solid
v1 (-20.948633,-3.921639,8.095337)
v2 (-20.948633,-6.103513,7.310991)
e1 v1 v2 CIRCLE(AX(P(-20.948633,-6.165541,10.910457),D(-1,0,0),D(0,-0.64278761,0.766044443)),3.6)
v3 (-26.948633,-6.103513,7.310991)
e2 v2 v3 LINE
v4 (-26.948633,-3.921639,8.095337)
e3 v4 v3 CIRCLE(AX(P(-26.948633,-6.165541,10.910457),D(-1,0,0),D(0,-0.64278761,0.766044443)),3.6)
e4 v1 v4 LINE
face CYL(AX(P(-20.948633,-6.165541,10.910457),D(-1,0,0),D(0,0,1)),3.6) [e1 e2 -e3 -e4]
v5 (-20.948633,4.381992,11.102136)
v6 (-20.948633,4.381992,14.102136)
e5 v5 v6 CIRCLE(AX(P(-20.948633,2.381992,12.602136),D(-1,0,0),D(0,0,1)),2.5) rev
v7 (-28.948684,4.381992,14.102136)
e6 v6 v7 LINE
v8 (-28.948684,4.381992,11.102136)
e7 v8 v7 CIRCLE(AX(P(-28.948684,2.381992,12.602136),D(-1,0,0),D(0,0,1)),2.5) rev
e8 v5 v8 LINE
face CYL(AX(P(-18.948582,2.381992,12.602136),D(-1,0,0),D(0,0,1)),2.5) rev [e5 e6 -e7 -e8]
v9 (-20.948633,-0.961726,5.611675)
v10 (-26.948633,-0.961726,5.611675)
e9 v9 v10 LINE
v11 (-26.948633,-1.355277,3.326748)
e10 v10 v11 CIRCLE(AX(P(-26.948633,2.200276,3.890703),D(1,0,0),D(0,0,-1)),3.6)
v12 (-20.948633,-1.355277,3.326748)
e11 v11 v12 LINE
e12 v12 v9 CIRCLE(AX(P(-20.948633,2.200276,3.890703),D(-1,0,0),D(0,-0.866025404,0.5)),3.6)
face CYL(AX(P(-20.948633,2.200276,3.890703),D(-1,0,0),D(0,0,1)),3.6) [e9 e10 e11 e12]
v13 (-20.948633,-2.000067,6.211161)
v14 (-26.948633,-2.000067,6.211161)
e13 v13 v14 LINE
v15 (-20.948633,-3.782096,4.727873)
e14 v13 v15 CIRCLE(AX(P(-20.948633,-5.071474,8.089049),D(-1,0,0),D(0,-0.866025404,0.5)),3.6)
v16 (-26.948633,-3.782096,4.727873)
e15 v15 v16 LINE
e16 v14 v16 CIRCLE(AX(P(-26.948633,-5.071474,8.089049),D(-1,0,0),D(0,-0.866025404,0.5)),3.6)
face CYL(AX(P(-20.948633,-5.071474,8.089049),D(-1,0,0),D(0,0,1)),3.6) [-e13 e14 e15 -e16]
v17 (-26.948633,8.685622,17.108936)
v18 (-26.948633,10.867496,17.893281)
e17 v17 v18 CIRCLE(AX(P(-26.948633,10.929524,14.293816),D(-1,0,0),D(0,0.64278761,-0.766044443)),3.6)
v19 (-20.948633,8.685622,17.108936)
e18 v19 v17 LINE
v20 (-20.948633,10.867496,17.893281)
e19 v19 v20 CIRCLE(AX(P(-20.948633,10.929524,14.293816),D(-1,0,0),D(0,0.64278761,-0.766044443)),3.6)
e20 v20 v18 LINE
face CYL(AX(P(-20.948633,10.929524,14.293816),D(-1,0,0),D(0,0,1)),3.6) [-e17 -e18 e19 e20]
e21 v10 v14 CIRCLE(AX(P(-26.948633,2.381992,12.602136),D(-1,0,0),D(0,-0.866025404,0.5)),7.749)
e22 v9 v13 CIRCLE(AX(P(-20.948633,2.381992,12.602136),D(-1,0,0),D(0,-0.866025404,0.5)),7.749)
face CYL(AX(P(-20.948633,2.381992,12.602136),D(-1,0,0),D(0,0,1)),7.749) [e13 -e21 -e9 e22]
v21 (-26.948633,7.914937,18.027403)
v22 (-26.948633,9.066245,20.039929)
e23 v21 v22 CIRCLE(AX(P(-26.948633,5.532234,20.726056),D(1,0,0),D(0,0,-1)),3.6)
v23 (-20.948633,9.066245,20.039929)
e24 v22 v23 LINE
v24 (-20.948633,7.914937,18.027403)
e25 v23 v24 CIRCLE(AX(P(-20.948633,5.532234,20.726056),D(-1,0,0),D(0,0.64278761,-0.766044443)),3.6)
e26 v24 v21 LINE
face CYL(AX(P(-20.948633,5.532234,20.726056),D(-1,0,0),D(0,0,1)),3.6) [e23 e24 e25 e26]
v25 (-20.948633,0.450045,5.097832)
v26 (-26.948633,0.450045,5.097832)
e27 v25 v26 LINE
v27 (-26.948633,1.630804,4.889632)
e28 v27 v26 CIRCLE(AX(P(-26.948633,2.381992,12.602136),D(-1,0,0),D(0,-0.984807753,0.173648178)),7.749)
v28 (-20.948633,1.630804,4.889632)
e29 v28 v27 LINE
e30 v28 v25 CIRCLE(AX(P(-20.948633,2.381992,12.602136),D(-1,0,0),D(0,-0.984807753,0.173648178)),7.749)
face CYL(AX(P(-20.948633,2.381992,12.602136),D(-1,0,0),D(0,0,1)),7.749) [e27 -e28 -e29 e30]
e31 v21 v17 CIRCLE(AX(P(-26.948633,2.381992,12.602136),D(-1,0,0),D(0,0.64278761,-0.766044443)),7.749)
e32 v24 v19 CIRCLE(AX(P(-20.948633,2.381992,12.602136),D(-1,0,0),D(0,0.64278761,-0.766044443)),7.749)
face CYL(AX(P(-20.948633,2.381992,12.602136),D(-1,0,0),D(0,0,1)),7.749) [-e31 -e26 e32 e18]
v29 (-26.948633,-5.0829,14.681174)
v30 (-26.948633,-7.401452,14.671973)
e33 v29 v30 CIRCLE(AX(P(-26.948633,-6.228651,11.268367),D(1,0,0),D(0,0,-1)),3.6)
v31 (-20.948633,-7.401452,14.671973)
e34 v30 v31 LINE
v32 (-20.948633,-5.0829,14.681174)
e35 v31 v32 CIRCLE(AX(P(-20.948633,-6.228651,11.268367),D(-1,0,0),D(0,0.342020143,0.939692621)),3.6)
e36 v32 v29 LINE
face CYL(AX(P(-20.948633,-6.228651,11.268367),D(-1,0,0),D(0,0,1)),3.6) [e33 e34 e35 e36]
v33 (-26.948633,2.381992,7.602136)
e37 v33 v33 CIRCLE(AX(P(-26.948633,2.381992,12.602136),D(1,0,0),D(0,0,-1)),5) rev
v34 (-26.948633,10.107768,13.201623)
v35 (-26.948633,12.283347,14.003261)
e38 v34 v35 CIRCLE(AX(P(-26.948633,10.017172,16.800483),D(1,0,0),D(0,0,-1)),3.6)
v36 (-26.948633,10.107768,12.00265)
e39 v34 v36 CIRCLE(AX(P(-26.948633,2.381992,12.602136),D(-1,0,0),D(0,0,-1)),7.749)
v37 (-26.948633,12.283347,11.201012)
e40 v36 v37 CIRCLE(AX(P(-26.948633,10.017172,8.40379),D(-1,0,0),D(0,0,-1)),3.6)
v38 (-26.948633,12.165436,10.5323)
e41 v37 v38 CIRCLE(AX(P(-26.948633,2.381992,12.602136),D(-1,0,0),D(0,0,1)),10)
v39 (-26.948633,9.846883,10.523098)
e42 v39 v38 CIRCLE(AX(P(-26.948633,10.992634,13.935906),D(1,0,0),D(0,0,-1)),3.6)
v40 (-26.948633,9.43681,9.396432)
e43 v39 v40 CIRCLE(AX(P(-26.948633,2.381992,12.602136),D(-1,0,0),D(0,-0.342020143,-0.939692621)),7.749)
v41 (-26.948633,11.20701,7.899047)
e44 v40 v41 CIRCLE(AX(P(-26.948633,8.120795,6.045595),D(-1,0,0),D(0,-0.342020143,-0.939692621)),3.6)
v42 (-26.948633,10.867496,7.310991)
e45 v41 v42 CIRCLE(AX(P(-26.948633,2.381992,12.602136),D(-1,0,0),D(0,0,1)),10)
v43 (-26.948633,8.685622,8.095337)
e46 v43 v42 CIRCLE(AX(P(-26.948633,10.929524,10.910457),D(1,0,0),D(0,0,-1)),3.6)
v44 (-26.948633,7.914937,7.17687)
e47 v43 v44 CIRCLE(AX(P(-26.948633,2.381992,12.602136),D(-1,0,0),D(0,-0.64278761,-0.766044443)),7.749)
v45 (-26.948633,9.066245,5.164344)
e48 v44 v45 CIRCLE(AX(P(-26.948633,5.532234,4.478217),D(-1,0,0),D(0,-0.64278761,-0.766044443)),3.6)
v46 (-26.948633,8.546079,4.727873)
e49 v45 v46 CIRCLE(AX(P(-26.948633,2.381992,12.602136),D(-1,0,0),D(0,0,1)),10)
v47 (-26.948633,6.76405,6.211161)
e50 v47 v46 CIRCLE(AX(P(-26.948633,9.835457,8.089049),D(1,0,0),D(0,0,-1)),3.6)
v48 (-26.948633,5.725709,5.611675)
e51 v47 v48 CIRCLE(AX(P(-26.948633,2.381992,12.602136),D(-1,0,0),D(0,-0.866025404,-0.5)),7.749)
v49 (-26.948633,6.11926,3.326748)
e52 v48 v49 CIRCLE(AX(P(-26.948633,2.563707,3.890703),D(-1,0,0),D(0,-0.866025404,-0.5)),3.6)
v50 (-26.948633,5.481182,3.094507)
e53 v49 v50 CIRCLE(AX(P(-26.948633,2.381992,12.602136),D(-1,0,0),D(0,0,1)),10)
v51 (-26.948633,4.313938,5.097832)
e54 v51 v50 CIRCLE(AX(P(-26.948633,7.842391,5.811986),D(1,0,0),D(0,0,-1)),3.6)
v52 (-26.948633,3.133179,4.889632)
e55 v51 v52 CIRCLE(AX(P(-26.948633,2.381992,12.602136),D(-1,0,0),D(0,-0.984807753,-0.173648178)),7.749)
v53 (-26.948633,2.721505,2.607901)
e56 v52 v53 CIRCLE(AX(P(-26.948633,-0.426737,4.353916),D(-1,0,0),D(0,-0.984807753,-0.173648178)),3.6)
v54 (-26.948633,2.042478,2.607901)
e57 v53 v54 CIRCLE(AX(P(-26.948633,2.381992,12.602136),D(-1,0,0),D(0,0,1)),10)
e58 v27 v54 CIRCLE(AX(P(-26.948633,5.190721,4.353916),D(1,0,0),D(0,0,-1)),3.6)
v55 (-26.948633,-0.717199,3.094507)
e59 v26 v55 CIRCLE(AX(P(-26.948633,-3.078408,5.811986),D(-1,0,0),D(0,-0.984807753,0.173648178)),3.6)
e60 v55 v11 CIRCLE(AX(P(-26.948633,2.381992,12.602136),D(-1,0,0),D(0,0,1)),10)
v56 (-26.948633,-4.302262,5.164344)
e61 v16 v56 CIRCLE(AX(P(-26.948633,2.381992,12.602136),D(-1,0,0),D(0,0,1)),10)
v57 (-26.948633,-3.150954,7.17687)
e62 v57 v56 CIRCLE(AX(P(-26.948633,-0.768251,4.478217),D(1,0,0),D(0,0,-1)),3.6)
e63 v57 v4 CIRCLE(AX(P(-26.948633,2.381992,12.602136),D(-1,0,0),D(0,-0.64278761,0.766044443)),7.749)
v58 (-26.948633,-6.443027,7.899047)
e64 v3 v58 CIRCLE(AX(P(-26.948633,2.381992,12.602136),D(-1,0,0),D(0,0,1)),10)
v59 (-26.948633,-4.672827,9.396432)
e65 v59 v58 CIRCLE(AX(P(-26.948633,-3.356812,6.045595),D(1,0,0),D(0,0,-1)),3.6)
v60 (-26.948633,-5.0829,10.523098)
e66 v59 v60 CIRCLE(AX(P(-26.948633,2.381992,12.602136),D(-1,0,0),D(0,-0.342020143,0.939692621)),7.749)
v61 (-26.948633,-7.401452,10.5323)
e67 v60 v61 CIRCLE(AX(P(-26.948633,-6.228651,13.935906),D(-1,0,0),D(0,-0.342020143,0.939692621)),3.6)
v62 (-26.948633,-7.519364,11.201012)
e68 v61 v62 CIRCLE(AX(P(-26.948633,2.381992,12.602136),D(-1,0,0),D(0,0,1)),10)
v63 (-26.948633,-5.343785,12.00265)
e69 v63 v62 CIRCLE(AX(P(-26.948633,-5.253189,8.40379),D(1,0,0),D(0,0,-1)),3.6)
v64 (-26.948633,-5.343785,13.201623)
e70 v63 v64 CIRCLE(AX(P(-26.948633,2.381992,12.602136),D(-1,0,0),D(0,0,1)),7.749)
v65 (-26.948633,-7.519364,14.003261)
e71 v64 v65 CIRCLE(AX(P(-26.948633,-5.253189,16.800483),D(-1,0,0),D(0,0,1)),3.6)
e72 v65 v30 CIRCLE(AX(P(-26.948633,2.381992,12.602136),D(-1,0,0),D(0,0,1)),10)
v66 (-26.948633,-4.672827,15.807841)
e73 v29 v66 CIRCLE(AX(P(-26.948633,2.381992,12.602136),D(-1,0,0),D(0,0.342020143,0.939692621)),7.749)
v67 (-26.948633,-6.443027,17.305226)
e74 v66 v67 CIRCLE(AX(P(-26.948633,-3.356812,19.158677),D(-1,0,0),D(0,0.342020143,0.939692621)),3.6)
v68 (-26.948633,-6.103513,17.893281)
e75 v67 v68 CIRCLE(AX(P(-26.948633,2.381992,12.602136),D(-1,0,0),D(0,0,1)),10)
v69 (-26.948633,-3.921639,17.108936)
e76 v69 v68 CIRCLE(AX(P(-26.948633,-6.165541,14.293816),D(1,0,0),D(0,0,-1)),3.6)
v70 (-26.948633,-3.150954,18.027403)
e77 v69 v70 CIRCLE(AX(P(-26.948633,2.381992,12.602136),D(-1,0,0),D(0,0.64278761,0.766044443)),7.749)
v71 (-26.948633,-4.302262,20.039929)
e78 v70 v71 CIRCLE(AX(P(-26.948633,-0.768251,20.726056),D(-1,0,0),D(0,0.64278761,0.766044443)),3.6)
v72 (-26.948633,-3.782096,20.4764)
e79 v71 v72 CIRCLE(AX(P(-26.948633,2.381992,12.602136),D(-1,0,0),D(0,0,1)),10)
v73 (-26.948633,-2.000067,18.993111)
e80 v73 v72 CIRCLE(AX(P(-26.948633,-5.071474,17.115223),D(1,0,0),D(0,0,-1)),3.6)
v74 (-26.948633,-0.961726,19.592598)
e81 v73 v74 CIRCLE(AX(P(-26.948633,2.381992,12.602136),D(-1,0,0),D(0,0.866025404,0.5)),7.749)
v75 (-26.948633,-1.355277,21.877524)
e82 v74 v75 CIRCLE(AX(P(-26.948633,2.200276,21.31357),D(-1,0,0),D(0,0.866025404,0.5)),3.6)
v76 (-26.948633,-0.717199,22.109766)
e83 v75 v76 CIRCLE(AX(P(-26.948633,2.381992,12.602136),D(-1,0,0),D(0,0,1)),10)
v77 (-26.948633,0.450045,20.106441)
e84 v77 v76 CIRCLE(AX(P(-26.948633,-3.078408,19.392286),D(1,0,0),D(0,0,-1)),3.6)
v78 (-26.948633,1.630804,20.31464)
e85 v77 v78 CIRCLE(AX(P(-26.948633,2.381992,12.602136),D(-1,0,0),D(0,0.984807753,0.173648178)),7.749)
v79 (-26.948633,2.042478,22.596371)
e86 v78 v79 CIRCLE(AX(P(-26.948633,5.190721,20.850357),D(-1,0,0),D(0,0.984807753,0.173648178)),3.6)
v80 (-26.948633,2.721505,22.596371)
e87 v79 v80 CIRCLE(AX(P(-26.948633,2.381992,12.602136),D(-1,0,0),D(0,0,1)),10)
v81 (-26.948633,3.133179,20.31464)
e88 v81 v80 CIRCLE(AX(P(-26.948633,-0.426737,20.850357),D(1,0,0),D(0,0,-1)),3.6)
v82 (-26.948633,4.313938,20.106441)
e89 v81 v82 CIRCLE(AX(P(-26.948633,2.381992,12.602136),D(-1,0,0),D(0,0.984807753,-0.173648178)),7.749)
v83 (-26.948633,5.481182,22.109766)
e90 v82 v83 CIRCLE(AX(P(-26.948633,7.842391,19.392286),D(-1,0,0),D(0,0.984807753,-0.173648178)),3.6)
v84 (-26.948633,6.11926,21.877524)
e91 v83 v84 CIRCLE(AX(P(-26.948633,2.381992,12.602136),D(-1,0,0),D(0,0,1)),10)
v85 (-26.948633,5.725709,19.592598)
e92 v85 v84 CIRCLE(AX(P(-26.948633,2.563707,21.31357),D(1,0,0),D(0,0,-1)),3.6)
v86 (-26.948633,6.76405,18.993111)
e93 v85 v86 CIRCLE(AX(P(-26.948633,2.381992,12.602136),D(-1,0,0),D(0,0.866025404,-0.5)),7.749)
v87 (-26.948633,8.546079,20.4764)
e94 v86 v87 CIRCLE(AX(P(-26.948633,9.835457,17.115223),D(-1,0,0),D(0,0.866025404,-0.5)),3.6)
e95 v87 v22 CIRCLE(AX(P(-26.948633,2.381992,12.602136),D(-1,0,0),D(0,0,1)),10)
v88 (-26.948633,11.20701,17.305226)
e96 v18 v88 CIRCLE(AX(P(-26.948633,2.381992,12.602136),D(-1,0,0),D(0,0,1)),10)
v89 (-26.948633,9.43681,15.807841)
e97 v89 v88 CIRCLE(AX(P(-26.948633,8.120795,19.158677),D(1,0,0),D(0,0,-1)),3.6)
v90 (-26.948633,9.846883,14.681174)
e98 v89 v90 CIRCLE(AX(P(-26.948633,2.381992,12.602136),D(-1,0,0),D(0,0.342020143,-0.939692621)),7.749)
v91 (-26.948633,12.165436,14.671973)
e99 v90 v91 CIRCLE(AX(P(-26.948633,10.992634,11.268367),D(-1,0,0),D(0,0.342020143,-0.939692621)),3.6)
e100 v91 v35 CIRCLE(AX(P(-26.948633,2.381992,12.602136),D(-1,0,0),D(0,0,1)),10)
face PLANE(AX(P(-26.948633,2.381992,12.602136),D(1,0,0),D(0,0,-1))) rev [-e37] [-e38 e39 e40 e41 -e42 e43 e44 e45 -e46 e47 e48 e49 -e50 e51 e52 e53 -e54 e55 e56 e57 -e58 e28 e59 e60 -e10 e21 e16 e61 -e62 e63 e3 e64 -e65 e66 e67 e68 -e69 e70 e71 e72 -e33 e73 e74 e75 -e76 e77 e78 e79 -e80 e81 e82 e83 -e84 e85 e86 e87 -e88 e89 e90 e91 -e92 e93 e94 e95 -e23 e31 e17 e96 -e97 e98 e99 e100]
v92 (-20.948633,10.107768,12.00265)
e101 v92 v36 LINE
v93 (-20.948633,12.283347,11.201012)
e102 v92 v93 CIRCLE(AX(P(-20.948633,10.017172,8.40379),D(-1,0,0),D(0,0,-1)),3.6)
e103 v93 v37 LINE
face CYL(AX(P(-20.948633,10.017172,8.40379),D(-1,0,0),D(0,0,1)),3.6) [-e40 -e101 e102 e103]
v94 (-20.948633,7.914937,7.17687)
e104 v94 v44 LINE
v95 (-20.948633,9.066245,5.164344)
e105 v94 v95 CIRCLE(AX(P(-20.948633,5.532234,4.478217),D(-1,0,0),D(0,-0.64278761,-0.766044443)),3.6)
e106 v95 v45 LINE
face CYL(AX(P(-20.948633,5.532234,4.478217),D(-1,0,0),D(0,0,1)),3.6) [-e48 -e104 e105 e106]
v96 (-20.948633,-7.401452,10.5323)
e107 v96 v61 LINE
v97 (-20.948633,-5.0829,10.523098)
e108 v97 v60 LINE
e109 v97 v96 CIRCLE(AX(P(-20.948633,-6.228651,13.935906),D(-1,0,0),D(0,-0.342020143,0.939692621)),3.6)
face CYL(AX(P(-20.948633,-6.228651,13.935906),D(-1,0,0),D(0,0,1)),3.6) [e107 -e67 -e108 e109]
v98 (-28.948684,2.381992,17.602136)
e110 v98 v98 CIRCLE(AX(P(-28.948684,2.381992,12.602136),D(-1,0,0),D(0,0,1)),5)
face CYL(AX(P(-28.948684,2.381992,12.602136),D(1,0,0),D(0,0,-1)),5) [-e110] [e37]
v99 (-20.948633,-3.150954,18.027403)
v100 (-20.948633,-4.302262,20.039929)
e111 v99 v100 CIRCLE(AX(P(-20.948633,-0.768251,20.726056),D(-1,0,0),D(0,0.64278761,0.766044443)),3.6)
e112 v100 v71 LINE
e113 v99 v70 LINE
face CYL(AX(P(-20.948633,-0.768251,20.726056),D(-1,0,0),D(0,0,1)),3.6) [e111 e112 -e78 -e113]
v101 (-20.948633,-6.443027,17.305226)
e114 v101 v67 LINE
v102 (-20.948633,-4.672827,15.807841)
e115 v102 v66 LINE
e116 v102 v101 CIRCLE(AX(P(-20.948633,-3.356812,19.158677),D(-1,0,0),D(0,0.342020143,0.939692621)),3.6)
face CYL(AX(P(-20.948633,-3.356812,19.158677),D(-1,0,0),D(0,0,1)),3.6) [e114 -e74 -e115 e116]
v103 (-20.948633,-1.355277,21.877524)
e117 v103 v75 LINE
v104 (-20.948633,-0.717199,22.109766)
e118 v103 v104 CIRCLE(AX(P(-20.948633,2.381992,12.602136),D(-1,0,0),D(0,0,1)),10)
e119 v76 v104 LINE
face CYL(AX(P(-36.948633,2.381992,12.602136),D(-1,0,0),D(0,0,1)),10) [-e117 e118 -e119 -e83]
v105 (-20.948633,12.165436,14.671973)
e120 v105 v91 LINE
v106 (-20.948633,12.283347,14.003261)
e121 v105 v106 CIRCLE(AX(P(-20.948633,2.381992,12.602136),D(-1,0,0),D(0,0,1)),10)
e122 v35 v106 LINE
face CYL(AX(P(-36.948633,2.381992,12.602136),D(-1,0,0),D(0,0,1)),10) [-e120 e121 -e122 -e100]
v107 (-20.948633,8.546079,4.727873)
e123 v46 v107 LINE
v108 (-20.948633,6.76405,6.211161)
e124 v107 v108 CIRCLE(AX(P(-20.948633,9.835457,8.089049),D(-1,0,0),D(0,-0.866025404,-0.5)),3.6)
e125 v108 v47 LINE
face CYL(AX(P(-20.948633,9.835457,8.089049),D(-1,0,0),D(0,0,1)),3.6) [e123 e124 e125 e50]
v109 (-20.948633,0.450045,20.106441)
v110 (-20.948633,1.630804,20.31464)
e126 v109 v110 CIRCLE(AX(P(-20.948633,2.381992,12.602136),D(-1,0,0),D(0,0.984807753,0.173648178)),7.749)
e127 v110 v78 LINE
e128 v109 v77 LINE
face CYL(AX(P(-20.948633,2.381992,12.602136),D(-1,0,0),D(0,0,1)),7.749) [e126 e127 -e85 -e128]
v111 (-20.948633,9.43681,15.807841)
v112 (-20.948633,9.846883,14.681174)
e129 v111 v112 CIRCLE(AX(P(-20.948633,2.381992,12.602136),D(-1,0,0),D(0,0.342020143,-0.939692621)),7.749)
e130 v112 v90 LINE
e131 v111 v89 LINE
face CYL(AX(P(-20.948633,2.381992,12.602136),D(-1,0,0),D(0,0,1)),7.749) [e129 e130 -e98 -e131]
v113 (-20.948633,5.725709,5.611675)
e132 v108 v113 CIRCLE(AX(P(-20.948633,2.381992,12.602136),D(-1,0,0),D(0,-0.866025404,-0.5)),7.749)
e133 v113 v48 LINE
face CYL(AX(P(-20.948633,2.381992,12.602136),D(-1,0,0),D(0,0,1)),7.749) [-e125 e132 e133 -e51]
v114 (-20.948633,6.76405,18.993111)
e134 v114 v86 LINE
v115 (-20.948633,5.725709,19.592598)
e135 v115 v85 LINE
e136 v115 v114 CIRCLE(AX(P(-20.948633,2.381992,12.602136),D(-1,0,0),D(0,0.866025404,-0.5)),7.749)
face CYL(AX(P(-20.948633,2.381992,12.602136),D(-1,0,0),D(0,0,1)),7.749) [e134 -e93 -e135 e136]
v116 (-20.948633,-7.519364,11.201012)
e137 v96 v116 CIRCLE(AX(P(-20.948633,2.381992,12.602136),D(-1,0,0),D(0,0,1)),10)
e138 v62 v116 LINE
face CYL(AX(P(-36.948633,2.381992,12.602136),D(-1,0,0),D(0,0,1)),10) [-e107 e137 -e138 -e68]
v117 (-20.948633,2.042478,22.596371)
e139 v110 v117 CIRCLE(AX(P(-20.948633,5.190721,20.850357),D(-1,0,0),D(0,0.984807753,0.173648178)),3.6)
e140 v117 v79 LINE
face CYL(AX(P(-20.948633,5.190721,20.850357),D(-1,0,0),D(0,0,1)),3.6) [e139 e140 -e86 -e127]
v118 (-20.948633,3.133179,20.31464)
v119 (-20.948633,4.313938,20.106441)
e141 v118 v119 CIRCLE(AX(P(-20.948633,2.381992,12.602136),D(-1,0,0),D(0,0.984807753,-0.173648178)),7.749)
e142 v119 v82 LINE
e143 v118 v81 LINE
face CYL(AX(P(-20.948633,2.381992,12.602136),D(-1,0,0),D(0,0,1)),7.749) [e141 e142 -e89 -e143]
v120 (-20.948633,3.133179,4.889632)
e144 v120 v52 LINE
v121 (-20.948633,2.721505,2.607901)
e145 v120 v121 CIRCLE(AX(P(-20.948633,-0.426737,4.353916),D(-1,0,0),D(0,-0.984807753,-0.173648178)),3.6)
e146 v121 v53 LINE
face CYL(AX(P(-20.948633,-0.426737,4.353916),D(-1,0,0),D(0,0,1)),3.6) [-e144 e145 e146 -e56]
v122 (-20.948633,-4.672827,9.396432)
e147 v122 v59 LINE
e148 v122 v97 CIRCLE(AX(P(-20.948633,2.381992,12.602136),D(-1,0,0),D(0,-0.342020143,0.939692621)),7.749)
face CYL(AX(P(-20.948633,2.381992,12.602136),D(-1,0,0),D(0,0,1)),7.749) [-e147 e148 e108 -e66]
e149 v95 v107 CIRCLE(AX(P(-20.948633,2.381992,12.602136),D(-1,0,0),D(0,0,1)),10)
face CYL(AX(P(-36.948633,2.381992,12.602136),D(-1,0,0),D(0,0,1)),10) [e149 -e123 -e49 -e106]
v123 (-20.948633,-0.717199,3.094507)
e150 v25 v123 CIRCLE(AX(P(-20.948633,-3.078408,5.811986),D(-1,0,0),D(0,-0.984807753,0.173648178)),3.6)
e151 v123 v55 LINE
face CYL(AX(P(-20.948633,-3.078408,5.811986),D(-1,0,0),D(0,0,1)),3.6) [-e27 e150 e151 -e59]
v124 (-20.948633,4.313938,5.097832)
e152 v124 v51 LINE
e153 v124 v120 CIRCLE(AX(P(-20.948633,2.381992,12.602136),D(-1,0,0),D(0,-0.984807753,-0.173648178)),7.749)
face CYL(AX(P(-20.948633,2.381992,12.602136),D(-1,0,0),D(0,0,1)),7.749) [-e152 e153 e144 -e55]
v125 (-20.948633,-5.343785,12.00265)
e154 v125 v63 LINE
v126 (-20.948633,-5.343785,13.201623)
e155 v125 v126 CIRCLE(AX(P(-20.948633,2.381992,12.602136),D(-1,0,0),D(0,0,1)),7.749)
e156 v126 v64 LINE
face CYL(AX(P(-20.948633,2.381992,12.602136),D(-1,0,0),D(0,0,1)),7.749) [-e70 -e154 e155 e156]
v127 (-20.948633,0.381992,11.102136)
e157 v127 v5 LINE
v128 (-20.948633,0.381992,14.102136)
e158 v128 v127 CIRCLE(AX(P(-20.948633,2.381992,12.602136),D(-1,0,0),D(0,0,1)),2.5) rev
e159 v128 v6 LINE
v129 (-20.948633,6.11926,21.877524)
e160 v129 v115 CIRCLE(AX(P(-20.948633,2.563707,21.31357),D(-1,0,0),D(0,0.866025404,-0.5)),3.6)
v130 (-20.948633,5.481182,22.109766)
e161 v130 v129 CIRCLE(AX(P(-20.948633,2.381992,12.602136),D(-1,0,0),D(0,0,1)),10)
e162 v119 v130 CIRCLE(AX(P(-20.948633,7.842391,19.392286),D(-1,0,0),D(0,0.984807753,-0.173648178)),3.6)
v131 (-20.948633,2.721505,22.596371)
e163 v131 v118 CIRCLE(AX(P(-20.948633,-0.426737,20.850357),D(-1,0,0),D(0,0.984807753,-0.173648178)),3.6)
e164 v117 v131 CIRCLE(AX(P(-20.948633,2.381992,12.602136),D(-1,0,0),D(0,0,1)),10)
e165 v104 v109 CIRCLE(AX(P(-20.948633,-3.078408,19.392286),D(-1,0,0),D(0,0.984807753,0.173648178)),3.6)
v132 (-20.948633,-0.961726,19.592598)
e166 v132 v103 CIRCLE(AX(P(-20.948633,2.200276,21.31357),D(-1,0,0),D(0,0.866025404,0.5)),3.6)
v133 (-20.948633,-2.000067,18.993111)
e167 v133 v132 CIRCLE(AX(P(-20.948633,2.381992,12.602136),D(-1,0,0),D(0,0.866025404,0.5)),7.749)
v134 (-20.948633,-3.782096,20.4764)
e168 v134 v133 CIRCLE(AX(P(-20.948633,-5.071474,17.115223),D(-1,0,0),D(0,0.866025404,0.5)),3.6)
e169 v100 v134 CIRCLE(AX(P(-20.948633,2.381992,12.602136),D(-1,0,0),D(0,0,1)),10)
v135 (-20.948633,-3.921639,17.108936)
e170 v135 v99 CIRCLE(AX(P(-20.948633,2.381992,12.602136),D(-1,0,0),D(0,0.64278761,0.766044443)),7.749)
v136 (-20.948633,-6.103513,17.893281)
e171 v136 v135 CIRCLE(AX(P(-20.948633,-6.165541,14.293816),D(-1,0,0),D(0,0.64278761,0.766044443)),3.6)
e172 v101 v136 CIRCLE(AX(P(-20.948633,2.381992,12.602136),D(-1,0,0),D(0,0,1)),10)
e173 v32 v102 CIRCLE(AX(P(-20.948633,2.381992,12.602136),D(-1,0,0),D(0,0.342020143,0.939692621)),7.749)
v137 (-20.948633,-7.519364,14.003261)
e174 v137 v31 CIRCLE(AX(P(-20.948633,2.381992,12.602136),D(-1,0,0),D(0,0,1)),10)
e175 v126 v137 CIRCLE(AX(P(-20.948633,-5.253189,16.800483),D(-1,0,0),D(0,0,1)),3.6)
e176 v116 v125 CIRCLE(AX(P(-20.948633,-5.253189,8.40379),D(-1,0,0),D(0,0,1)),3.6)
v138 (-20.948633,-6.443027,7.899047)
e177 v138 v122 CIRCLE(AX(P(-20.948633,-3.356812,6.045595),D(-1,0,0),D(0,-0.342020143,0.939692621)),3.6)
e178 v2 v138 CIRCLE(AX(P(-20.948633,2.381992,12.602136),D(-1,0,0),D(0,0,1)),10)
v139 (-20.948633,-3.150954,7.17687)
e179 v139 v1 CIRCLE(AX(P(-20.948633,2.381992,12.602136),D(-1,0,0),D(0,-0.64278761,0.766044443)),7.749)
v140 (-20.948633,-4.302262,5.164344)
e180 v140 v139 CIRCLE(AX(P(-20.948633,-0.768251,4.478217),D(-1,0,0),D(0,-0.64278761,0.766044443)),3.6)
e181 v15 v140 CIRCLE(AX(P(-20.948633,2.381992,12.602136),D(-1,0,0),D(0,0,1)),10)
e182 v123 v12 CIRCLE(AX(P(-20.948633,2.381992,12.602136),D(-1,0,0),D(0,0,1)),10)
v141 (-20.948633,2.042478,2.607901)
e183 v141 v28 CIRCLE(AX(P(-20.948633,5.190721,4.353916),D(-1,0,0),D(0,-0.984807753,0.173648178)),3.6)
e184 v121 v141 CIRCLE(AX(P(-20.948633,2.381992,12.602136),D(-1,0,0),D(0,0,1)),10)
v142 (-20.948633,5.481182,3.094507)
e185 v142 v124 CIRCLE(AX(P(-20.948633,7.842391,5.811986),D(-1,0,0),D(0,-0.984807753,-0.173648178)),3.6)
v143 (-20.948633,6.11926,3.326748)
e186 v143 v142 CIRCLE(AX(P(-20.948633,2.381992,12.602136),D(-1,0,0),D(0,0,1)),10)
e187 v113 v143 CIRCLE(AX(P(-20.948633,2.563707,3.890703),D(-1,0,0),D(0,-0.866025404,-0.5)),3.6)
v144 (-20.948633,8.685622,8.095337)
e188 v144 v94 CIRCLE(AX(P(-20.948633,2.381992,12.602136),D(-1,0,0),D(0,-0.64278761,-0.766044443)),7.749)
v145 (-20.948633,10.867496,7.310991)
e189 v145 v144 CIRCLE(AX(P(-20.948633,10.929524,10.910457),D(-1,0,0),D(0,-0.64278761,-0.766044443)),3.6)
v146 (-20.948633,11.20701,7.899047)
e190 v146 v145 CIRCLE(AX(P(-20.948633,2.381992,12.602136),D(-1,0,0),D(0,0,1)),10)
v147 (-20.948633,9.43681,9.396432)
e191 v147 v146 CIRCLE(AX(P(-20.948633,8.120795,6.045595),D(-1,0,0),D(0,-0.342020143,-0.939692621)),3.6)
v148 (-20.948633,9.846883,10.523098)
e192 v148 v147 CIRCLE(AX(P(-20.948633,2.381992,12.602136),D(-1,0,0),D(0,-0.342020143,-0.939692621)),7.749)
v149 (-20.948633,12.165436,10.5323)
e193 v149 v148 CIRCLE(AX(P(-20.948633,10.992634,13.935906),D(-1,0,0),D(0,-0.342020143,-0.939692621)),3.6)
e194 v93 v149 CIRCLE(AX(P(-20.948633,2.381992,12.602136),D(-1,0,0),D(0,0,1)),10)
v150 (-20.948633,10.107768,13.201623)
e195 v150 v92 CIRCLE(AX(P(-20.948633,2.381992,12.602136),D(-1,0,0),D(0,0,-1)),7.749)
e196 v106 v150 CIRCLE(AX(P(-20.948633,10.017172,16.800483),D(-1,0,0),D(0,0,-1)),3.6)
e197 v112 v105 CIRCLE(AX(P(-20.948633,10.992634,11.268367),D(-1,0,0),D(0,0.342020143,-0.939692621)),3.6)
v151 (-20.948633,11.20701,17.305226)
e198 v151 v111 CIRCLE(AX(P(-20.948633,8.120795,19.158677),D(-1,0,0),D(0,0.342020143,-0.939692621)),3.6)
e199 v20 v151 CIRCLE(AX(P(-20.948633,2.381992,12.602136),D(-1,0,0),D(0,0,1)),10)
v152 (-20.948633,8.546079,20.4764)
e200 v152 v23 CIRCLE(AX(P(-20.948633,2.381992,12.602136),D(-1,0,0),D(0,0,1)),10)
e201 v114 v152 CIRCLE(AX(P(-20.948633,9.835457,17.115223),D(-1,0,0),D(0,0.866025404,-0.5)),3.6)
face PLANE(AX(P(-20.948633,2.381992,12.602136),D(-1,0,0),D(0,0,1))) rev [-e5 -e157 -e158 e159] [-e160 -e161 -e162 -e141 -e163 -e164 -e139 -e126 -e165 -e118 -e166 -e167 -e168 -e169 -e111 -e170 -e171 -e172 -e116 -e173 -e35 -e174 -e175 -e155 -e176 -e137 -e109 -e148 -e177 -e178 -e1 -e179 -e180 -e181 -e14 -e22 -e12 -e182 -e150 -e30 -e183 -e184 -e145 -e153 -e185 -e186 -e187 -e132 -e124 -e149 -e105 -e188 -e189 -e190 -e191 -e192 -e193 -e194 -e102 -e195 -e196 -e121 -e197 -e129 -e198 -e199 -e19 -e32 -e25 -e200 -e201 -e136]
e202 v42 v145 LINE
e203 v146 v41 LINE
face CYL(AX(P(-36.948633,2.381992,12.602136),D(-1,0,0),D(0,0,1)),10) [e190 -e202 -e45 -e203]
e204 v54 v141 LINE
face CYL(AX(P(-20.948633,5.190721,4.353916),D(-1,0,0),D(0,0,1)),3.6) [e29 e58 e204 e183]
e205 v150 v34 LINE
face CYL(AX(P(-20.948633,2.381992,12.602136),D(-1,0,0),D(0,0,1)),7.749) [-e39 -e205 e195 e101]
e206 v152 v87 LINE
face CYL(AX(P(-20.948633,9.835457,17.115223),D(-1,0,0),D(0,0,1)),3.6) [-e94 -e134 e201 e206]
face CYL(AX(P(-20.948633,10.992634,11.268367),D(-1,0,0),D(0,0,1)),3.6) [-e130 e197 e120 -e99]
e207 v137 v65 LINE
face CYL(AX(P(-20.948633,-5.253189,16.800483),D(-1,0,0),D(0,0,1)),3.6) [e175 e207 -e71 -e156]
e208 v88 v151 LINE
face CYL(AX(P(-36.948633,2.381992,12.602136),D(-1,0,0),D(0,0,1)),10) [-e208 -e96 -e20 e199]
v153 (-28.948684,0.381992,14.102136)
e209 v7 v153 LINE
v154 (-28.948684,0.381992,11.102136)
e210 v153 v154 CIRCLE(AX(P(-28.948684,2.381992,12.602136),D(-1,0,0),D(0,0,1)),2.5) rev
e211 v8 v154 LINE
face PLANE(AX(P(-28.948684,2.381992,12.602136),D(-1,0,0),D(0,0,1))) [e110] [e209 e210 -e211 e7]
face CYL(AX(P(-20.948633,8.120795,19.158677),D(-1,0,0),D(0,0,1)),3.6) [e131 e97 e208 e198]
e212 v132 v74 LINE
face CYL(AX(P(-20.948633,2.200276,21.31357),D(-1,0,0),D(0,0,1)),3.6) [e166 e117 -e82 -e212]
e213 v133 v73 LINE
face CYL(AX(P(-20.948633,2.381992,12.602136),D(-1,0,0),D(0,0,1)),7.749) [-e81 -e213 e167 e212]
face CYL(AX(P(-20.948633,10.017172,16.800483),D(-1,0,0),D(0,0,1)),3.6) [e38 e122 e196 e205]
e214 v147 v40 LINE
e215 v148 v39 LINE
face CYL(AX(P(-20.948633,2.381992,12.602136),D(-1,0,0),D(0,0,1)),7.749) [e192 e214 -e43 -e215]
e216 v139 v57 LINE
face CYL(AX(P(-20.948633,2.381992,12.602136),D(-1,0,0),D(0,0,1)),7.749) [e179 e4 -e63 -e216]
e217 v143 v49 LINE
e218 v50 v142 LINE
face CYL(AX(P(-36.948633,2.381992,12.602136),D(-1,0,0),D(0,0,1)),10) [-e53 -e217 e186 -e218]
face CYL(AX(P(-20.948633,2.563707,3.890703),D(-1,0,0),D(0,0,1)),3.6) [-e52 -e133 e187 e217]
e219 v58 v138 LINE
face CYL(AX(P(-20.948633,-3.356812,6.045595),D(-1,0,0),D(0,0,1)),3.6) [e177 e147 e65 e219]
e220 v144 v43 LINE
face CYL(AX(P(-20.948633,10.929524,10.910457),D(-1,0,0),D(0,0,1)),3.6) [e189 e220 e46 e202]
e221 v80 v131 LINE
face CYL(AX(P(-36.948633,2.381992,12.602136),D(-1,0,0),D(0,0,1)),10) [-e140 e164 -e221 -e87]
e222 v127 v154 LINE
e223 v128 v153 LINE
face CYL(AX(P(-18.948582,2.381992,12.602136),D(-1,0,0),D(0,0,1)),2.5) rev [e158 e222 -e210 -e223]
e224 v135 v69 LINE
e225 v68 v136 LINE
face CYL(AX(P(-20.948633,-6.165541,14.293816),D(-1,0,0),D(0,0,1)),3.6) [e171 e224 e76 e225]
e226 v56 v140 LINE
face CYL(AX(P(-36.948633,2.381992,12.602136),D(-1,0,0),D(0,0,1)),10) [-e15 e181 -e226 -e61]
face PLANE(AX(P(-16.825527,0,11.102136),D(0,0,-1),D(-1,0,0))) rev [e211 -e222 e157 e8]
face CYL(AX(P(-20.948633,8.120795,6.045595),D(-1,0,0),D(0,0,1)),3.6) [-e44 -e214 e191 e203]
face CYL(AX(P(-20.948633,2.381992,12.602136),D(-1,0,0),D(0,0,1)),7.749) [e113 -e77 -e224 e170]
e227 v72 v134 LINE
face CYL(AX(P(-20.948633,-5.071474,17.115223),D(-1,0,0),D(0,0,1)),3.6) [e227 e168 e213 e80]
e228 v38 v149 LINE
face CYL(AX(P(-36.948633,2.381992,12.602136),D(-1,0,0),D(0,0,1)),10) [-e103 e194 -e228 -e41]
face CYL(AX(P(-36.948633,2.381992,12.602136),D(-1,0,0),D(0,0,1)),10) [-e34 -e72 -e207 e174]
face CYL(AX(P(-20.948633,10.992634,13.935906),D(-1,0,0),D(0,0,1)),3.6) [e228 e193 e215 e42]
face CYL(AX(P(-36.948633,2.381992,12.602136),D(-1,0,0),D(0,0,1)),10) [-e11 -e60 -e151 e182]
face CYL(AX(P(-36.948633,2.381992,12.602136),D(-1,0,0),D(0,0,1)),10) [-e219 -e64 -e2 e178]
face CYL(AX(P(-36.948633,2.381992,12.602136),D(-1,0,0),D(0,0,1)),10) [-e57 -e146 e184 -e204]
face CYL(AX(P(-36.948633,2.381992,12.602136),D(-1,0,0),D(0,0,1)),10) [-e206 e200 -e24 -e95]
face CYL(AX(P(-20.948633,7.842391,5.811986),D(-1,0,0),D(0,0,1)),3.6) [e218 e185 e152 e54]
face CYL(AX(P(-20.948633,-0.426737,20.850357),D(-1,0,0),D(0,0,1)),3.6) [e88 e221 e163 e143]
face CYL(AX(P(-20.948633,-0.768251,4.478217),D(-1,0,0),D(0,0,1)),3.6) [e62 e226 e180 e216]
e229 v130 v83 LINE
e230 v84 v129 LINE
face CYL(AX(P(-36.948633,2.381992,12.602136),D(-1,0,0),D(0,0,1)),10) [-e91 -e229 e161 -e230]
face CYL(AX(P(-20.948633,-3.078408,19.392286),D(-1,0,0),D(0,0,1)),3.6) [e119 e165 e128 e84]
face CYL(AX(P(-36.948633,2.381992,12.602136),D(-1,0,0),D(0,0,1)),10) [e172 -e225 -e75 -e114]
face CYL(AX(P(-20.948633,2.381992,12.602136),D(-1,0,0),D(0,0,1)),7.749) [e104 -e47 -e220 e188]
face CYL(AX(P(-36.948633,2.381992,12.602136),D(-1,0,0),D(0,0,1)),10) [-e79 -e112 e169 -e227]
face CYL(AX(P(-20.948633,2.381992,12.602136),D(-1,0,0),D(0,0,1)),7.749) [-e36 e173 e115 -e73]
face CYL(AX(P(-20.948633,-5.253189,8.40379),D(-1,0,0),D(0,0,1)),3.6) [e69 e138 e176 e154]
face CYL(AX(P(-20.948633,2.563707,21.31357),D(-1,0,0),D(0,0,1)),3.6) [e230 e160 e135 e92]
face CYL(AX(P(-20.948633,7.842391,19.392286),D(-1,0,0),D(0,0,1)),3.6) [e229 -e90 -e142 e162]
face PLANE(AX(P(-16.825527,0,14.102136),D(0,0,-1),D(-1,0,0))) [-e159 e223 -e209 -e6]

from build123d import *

# Parameters (mm, degrees)
SPUR_START                  = -26.948632746
SPUR_GEAR_ISO_OUTLINE_R     = 2.5
SPUR_GEAR_ISO_DEPTH         = 6
SPUR_START_2                = -28.948683546
SPUR_GEAR_ISO_2_OUTLINE_R   = 5
SPUR_GEAR_ISO_2_OUTLINE_R_2 = 2.5
SPUR_GEAR_ISO_2_DEPTH       = 2.0000508
BOSS_EXTRUDE1_DEPTH         = 8.0000508


# Read off the part's stored shape, not the designer's step: spur gear_iso
with BuildPart() as part:
    # spur gear_iso outline → spur gear_iso (new body)
    with BuildSketch(Plane.YZ.offset(SPUR_START)):
        with BuildLine():
            ThreePointArc((9.06624461, 20.039929061), (8.809867644, 20.262580741), (8.54607915, 20.476399706))
            ThreePointArc((8.54607915, 20.476399706), (7.532383697, 19.882145035), (6.764050297, 18.993111362))
            ThreePointArc((6.764050297, 18.993111362), (6.256491547, 19.312967164), (5.725708923, 19.592598034))
            ThreePointArc((5.725708923, 19.592598034), (6.111467968, 20.702511114), (6.119259883, 21.877524463))
            ThreePointArc((6.119259883, 21.877524463), (5.802192981, 21.999062518), (5.481182486, 22.109765643))
            ThreePointArc((5.481182486, 22.109765643), (4.731867417, 21.20464465), (4.313937615, 20.106440768))
            ThreePointArc((4.313937615, 20.106440768), (3.727591276, 20.233411588), (3.13317937, 20.314640304))
            ThreePointArc((3.13317937, 20.314640304), (3.116061668, 21.489554798), (2.721505439, 22.596371164))
            ThreePointArc((2.721505439, 22.596371164), (2.381991548, 22.60213631), (2.042477656, 22.596371164))
            ThreePointArc((2.042477656, 22.596371164), (1.647921427, 21.489554798), (1.630803724, 20.314640304))
            ThreePointArc((1.630803724, 20.314640304), (1.036391818, 20.233411588), (0.45004548, 20.106440768))
            ThreePointArc((0.45004548, 20.106440768), (0.032115678, 21.20464465), (-0.717199391, 22.109765643))
            ThreePointArc((-0.717199391, 22.109765643), (-1.038209886, 21.999062518), (-1.355276788, 21.877524463))
            ThreePointArc((-1.355276788, 21.877524463), (-1.347484873, 20.702511114), (-0.961725828, 19.592598034))
            ThreePointArc((-0.961725828, 19.592598034), (-1.492508453, 19.312967164), (-2.000067202, 18.993111362))
            ThreePointArc((-2.000067202, 18.993111362), (-2.768400602, 19.882145035), (-3.782096055, 20.476399706))
            ThreePointArc((-3.782096055, 20.476399706), (-4.045884549, 20.262580741), (-4.302261515, 20.039929061))
            ThreePointArc((-4.302261515, 20.039929061), (-3.893061276, 18.938442679), (-3.150953717, 18.027402912))
            ThreePointArc((-3.150953717, 18.027402912), (-3.554086842, 17.583097498), (-3.921638927, 17.108936045))
            ThreePointArc((-3.921638927, 17.108936045), (-4.947703578, 17.681568927), (-6.103512782, 17.893281392))
            ThreePointArc((-6.103512782, 17.893281392), (-6.27826249, 17.60213631), (-6.443026673, 17.305226082))
            ThreePointArc((-6.443026673, 17.305226082), (-5.681773697, 16.410122182), (-4.672826749, 15.807840569))
            ThreePointArc((-4.672826749, 15.807840569), (-4.899686571, 15.252450401), (-5.082899784, 14.681174166))
            ThreePointArc((-5.082899784, 14.681174166), (-6.242937146, 14.868338281), (-7.401452454, 14.671972892))
            ThreePointArc((-7.401452454, 14.671972892), (-7.466085983, 14.338618087), (-7.519364391, 14.003261067))
            ThreePointArc((-7.519364391, 14.003261067), (-6.497877023, 13.422502389), (-5.343784577, 13.201622982))
            ThreePointArc((-5.343784577, 13.201622982), (-5.367008453, 12.60213631), (-5.343784577, 12.002649638))
            ThreePointArc((-5.343784577, 12.002649638), (-6.497877023, 11.781770232), (-7.519364391, 11.201011553))
            ThreePointArc((-7.519364391, 11.201011553), (-7.466085983, 10.865654533), (-7.401452454, 10.532299728))
            ThreePointArc((-7.401452454, 10.532299728), (-6.242937146, 10.335934339), (-5.082899784, 10.523098454))
            ThreePointArc((-5.082899784, 10.523098454), (-4.899686571, 9.951822219), (-4.672826749, 9.396432051))
            ThreePointArc((-4.672826749, 9.396432051), (-5.681773698, 8.794150439), (-6.443026673, 7.899046538))
            ThreePointArc((-6.443026673, 7.899046538), (-6.27826249, 7.60213631), (-6.103512782, 7.310991228))
            ThreePointArc((-6.103512782, 7.310991228), (-4.947703577, 7.522703693), (-3.921638927, 8.095336576))
            ThreePointArc((-3.921638927, 8.095336576), (-3.554086842, 7.621175123), (-3.150953717, 7.176869708))
            ThreePointArc((-3.150953717, 7.176869708), (-3.893061276, 6.265829942), (-4.302261515, 5.16434356))
            ThreePointArc((-4.302261515, 5.16434356), (-4.045884549, 4.941691879), (-3.782096055, 4.727872914))
            ThreePointArc((-3.782096055, 4.727872914), (-2.768400602, 5.322127585), (-2.000067202, 6.211161258))
            ThreePointArc((-2.000067202, 6.211161258), (-1.492508453, 5.891305456), (-0.961725828, 5.611674586))
            ThreePointArc((-0.961725828, 5.611674586), (-1.347484873, 4.501761506), (-1.355276788, 3.326748157))
            ThreePointArc((-1.355276788, 3.326748157), (-1.038209886, 3.205210102), (-0.717199391, 3.094506978))
            ThreePointArc((-0.717199391, 3.094506978), (0.032115678, 3.999627971), (0.45004548, 5.097831853))
            ThreePointArc((0.45004548, 5.097831853), (1.036391818, 4.970861032), (1.630803724, 4.889632316))
            ThreePointArc((1.630803724, 4.889632316), (1.647921427, 3.714717822), (2.042477656, 2.607901456))
            ThreePointArc((2.042477656, 2.607901456), (2.381991548, 2.60213631), (2.721505439, 2.607901456))
            ThreePointArc((2.721505439, 2.607901456), (3.116061668, 3.714717822), (3.13317937, 4.889632316))
            ThreePointArc((3.13317937, 4.889632316), (3.727591276, 4.970861032), (4.313937615, 5.097831853))
            ThreePointArc((4.313937615, 5.097831853), (4.731867417, 3.999627971), (5.481182486, 3.094506978))
            ThreePointArc((5.481182486, 3.094506978), (5.802192981, 3.205210102), (6.119259883, 3.326748157))
            ThreePointArc((6.119259883, 3.326748157), (6.111467968, 4.501761506), (5.725708923, 5.611674586))
            ThreePointArc((5.725708923, 5.611674586), (6.256491547, 5.891305456), (6.764050297, 6.211161258))
            ThreePointArc((6.764050297, 6.211161258), (7.532383697, 5.322127585), (8.54607915, 4.727872914))
            ThreePointArc((8.54607915, 4.727872914), (8.809867644, 4.941691879), (9.06624461, 5.16434356))
            ThreePointArc((9.06624461, 5.16434356), (8.657044371, 6.265829942), (7.914936812, 7.176869708))
            ThreePointArc((7.914936812, 7.176869708), (8.318069937, 7.621175123), (8.685622021, 8.095336576))
            ThreePointArc((8.685622021, 8.095336576), (9.711686672, 7.522703693), (10.867495877, 7.310991228))
            ThreePointArc((10.867495877, 7.310991228), (11.042245585, 7.60213631), (11.207009768, 7.899046538))
            ThreePointArc((11.207009768, 7.899046538), (10.445756793, 8.794150439), (9.436809844, 9.396432051))
            ThreePointArc((9.436809844, 9.396432051), (9.663669666, 9.951822219), (9.846882879, 10.523098454))
            ThreePointArc((9.846882879, 10.523098454), (11.006920241, 10.335934339), (12.165435549, 10.532299728))
            ThreePointArc((12.165435549, 10.532299728), (12.230069078, 10.865654533), (12.283347486, 11.201011553))
            ThreePointArc((12.283347486, 11.201011553), (11.261860118, 11.781770232), (10.107767672, 12.002649638))
            ThreePointArc((10.107767672, 12.002649638), (10.130991547, 12.60213631), (10.107767672, 13.201622982))
            ThreePointArc((10.107767672, 13.201622982), (11.261860118, 13.422502389), (12.283347486, 14.003261067))
            ThreePointArc((12.283347486, 14.003261067), (12.230069078, 14.338618087), (12.165435549, 14.671972892))
            ThreePointArc((12.165435549, 14.671972892), (11.006920241, 14.868338281), (9.846882879, 14.681174166))
            ThreePointArc((9.846882879, 14.681174166), (9.663669666, 15.252450401), (9.436809844, 15.807840569))
            ThreePointArc((9.436809844, 15.807840569), (10.445756792, 16.410122182), (11.207009768, 17.305226082))
            ThreePointArc((11.207009768, 17.305226082), (11.042245585, 17.60213631), (10.867495877, 17.893281392))
            ThreePointArc((10.867495877, 17.893281392), (9.711686672, 17.681568927), (8.685622021, 17.108936045))
            ThreePointArc((8.685622021, 17.108936045), (8.318069937, 17.583097498), (7.914936812, 18.027402912))
            ThreePointArc((7.914936812, 18.027402912), (8.657044371, 18.938442679), (9.06624461, 20.039929061))
        make_face()
        with Locations((2.381991547, 12.60213631)):
            Circle(SPUR_GEAR_ISO_OUTLINE_R, mode=Mode.SUBTRACT)
    extrude(amount=SPUR_GEAR_ISO_DEPTH)

    # spur gear_iso 2 outline → spur gear_iso 2 (add)
    with BuildSketch(Plane.YZ.offset(SPUR_START_2)):
        with Locations((2.381991547, 12.60213631)):
            Circle(SPUR_GEAR_ISO_2_OUTLINE_R)
        with Locations((2.381991547, 12.60213631)):
            Circle(SPUR_GEAR_ISO_2_OUTLINE_R_2, mode=Mode.SUBTRACT)
    extrude(amount=SPUR_GEAR_ISO_2_DEPTH)

    # Sketch1 → Boss-Extrude1 (add)
    with BuildSketch(Plane.ZY.offset(28.948683546)):
        with BuildLine():
            Line((11.10213631, 0.381991547), (11.10213631, 4.381991547))
            ThreePointArc((11.10213631, 4.381991547), (10.10213631, 2.381991547), (11.10213631, 0.381991547))
        make_face()
        with BuildLine():
            ThreePointArc((15.10213631, 2.381991547), (14.838204288, 3.500025536), (14.10213631, 4.381991547))
            Line((14.10213631, 4.381991547), (14.10213631, 0.381991547))
            ThreePointArc((14.10213631, 0.381991547), (14.838204288, 1.263957559), (15.10213631, 2.381991547))
        make_face()
    extrude(amount=-BOSS_EXTRUDE1_DEPTH)


solid = part.part
